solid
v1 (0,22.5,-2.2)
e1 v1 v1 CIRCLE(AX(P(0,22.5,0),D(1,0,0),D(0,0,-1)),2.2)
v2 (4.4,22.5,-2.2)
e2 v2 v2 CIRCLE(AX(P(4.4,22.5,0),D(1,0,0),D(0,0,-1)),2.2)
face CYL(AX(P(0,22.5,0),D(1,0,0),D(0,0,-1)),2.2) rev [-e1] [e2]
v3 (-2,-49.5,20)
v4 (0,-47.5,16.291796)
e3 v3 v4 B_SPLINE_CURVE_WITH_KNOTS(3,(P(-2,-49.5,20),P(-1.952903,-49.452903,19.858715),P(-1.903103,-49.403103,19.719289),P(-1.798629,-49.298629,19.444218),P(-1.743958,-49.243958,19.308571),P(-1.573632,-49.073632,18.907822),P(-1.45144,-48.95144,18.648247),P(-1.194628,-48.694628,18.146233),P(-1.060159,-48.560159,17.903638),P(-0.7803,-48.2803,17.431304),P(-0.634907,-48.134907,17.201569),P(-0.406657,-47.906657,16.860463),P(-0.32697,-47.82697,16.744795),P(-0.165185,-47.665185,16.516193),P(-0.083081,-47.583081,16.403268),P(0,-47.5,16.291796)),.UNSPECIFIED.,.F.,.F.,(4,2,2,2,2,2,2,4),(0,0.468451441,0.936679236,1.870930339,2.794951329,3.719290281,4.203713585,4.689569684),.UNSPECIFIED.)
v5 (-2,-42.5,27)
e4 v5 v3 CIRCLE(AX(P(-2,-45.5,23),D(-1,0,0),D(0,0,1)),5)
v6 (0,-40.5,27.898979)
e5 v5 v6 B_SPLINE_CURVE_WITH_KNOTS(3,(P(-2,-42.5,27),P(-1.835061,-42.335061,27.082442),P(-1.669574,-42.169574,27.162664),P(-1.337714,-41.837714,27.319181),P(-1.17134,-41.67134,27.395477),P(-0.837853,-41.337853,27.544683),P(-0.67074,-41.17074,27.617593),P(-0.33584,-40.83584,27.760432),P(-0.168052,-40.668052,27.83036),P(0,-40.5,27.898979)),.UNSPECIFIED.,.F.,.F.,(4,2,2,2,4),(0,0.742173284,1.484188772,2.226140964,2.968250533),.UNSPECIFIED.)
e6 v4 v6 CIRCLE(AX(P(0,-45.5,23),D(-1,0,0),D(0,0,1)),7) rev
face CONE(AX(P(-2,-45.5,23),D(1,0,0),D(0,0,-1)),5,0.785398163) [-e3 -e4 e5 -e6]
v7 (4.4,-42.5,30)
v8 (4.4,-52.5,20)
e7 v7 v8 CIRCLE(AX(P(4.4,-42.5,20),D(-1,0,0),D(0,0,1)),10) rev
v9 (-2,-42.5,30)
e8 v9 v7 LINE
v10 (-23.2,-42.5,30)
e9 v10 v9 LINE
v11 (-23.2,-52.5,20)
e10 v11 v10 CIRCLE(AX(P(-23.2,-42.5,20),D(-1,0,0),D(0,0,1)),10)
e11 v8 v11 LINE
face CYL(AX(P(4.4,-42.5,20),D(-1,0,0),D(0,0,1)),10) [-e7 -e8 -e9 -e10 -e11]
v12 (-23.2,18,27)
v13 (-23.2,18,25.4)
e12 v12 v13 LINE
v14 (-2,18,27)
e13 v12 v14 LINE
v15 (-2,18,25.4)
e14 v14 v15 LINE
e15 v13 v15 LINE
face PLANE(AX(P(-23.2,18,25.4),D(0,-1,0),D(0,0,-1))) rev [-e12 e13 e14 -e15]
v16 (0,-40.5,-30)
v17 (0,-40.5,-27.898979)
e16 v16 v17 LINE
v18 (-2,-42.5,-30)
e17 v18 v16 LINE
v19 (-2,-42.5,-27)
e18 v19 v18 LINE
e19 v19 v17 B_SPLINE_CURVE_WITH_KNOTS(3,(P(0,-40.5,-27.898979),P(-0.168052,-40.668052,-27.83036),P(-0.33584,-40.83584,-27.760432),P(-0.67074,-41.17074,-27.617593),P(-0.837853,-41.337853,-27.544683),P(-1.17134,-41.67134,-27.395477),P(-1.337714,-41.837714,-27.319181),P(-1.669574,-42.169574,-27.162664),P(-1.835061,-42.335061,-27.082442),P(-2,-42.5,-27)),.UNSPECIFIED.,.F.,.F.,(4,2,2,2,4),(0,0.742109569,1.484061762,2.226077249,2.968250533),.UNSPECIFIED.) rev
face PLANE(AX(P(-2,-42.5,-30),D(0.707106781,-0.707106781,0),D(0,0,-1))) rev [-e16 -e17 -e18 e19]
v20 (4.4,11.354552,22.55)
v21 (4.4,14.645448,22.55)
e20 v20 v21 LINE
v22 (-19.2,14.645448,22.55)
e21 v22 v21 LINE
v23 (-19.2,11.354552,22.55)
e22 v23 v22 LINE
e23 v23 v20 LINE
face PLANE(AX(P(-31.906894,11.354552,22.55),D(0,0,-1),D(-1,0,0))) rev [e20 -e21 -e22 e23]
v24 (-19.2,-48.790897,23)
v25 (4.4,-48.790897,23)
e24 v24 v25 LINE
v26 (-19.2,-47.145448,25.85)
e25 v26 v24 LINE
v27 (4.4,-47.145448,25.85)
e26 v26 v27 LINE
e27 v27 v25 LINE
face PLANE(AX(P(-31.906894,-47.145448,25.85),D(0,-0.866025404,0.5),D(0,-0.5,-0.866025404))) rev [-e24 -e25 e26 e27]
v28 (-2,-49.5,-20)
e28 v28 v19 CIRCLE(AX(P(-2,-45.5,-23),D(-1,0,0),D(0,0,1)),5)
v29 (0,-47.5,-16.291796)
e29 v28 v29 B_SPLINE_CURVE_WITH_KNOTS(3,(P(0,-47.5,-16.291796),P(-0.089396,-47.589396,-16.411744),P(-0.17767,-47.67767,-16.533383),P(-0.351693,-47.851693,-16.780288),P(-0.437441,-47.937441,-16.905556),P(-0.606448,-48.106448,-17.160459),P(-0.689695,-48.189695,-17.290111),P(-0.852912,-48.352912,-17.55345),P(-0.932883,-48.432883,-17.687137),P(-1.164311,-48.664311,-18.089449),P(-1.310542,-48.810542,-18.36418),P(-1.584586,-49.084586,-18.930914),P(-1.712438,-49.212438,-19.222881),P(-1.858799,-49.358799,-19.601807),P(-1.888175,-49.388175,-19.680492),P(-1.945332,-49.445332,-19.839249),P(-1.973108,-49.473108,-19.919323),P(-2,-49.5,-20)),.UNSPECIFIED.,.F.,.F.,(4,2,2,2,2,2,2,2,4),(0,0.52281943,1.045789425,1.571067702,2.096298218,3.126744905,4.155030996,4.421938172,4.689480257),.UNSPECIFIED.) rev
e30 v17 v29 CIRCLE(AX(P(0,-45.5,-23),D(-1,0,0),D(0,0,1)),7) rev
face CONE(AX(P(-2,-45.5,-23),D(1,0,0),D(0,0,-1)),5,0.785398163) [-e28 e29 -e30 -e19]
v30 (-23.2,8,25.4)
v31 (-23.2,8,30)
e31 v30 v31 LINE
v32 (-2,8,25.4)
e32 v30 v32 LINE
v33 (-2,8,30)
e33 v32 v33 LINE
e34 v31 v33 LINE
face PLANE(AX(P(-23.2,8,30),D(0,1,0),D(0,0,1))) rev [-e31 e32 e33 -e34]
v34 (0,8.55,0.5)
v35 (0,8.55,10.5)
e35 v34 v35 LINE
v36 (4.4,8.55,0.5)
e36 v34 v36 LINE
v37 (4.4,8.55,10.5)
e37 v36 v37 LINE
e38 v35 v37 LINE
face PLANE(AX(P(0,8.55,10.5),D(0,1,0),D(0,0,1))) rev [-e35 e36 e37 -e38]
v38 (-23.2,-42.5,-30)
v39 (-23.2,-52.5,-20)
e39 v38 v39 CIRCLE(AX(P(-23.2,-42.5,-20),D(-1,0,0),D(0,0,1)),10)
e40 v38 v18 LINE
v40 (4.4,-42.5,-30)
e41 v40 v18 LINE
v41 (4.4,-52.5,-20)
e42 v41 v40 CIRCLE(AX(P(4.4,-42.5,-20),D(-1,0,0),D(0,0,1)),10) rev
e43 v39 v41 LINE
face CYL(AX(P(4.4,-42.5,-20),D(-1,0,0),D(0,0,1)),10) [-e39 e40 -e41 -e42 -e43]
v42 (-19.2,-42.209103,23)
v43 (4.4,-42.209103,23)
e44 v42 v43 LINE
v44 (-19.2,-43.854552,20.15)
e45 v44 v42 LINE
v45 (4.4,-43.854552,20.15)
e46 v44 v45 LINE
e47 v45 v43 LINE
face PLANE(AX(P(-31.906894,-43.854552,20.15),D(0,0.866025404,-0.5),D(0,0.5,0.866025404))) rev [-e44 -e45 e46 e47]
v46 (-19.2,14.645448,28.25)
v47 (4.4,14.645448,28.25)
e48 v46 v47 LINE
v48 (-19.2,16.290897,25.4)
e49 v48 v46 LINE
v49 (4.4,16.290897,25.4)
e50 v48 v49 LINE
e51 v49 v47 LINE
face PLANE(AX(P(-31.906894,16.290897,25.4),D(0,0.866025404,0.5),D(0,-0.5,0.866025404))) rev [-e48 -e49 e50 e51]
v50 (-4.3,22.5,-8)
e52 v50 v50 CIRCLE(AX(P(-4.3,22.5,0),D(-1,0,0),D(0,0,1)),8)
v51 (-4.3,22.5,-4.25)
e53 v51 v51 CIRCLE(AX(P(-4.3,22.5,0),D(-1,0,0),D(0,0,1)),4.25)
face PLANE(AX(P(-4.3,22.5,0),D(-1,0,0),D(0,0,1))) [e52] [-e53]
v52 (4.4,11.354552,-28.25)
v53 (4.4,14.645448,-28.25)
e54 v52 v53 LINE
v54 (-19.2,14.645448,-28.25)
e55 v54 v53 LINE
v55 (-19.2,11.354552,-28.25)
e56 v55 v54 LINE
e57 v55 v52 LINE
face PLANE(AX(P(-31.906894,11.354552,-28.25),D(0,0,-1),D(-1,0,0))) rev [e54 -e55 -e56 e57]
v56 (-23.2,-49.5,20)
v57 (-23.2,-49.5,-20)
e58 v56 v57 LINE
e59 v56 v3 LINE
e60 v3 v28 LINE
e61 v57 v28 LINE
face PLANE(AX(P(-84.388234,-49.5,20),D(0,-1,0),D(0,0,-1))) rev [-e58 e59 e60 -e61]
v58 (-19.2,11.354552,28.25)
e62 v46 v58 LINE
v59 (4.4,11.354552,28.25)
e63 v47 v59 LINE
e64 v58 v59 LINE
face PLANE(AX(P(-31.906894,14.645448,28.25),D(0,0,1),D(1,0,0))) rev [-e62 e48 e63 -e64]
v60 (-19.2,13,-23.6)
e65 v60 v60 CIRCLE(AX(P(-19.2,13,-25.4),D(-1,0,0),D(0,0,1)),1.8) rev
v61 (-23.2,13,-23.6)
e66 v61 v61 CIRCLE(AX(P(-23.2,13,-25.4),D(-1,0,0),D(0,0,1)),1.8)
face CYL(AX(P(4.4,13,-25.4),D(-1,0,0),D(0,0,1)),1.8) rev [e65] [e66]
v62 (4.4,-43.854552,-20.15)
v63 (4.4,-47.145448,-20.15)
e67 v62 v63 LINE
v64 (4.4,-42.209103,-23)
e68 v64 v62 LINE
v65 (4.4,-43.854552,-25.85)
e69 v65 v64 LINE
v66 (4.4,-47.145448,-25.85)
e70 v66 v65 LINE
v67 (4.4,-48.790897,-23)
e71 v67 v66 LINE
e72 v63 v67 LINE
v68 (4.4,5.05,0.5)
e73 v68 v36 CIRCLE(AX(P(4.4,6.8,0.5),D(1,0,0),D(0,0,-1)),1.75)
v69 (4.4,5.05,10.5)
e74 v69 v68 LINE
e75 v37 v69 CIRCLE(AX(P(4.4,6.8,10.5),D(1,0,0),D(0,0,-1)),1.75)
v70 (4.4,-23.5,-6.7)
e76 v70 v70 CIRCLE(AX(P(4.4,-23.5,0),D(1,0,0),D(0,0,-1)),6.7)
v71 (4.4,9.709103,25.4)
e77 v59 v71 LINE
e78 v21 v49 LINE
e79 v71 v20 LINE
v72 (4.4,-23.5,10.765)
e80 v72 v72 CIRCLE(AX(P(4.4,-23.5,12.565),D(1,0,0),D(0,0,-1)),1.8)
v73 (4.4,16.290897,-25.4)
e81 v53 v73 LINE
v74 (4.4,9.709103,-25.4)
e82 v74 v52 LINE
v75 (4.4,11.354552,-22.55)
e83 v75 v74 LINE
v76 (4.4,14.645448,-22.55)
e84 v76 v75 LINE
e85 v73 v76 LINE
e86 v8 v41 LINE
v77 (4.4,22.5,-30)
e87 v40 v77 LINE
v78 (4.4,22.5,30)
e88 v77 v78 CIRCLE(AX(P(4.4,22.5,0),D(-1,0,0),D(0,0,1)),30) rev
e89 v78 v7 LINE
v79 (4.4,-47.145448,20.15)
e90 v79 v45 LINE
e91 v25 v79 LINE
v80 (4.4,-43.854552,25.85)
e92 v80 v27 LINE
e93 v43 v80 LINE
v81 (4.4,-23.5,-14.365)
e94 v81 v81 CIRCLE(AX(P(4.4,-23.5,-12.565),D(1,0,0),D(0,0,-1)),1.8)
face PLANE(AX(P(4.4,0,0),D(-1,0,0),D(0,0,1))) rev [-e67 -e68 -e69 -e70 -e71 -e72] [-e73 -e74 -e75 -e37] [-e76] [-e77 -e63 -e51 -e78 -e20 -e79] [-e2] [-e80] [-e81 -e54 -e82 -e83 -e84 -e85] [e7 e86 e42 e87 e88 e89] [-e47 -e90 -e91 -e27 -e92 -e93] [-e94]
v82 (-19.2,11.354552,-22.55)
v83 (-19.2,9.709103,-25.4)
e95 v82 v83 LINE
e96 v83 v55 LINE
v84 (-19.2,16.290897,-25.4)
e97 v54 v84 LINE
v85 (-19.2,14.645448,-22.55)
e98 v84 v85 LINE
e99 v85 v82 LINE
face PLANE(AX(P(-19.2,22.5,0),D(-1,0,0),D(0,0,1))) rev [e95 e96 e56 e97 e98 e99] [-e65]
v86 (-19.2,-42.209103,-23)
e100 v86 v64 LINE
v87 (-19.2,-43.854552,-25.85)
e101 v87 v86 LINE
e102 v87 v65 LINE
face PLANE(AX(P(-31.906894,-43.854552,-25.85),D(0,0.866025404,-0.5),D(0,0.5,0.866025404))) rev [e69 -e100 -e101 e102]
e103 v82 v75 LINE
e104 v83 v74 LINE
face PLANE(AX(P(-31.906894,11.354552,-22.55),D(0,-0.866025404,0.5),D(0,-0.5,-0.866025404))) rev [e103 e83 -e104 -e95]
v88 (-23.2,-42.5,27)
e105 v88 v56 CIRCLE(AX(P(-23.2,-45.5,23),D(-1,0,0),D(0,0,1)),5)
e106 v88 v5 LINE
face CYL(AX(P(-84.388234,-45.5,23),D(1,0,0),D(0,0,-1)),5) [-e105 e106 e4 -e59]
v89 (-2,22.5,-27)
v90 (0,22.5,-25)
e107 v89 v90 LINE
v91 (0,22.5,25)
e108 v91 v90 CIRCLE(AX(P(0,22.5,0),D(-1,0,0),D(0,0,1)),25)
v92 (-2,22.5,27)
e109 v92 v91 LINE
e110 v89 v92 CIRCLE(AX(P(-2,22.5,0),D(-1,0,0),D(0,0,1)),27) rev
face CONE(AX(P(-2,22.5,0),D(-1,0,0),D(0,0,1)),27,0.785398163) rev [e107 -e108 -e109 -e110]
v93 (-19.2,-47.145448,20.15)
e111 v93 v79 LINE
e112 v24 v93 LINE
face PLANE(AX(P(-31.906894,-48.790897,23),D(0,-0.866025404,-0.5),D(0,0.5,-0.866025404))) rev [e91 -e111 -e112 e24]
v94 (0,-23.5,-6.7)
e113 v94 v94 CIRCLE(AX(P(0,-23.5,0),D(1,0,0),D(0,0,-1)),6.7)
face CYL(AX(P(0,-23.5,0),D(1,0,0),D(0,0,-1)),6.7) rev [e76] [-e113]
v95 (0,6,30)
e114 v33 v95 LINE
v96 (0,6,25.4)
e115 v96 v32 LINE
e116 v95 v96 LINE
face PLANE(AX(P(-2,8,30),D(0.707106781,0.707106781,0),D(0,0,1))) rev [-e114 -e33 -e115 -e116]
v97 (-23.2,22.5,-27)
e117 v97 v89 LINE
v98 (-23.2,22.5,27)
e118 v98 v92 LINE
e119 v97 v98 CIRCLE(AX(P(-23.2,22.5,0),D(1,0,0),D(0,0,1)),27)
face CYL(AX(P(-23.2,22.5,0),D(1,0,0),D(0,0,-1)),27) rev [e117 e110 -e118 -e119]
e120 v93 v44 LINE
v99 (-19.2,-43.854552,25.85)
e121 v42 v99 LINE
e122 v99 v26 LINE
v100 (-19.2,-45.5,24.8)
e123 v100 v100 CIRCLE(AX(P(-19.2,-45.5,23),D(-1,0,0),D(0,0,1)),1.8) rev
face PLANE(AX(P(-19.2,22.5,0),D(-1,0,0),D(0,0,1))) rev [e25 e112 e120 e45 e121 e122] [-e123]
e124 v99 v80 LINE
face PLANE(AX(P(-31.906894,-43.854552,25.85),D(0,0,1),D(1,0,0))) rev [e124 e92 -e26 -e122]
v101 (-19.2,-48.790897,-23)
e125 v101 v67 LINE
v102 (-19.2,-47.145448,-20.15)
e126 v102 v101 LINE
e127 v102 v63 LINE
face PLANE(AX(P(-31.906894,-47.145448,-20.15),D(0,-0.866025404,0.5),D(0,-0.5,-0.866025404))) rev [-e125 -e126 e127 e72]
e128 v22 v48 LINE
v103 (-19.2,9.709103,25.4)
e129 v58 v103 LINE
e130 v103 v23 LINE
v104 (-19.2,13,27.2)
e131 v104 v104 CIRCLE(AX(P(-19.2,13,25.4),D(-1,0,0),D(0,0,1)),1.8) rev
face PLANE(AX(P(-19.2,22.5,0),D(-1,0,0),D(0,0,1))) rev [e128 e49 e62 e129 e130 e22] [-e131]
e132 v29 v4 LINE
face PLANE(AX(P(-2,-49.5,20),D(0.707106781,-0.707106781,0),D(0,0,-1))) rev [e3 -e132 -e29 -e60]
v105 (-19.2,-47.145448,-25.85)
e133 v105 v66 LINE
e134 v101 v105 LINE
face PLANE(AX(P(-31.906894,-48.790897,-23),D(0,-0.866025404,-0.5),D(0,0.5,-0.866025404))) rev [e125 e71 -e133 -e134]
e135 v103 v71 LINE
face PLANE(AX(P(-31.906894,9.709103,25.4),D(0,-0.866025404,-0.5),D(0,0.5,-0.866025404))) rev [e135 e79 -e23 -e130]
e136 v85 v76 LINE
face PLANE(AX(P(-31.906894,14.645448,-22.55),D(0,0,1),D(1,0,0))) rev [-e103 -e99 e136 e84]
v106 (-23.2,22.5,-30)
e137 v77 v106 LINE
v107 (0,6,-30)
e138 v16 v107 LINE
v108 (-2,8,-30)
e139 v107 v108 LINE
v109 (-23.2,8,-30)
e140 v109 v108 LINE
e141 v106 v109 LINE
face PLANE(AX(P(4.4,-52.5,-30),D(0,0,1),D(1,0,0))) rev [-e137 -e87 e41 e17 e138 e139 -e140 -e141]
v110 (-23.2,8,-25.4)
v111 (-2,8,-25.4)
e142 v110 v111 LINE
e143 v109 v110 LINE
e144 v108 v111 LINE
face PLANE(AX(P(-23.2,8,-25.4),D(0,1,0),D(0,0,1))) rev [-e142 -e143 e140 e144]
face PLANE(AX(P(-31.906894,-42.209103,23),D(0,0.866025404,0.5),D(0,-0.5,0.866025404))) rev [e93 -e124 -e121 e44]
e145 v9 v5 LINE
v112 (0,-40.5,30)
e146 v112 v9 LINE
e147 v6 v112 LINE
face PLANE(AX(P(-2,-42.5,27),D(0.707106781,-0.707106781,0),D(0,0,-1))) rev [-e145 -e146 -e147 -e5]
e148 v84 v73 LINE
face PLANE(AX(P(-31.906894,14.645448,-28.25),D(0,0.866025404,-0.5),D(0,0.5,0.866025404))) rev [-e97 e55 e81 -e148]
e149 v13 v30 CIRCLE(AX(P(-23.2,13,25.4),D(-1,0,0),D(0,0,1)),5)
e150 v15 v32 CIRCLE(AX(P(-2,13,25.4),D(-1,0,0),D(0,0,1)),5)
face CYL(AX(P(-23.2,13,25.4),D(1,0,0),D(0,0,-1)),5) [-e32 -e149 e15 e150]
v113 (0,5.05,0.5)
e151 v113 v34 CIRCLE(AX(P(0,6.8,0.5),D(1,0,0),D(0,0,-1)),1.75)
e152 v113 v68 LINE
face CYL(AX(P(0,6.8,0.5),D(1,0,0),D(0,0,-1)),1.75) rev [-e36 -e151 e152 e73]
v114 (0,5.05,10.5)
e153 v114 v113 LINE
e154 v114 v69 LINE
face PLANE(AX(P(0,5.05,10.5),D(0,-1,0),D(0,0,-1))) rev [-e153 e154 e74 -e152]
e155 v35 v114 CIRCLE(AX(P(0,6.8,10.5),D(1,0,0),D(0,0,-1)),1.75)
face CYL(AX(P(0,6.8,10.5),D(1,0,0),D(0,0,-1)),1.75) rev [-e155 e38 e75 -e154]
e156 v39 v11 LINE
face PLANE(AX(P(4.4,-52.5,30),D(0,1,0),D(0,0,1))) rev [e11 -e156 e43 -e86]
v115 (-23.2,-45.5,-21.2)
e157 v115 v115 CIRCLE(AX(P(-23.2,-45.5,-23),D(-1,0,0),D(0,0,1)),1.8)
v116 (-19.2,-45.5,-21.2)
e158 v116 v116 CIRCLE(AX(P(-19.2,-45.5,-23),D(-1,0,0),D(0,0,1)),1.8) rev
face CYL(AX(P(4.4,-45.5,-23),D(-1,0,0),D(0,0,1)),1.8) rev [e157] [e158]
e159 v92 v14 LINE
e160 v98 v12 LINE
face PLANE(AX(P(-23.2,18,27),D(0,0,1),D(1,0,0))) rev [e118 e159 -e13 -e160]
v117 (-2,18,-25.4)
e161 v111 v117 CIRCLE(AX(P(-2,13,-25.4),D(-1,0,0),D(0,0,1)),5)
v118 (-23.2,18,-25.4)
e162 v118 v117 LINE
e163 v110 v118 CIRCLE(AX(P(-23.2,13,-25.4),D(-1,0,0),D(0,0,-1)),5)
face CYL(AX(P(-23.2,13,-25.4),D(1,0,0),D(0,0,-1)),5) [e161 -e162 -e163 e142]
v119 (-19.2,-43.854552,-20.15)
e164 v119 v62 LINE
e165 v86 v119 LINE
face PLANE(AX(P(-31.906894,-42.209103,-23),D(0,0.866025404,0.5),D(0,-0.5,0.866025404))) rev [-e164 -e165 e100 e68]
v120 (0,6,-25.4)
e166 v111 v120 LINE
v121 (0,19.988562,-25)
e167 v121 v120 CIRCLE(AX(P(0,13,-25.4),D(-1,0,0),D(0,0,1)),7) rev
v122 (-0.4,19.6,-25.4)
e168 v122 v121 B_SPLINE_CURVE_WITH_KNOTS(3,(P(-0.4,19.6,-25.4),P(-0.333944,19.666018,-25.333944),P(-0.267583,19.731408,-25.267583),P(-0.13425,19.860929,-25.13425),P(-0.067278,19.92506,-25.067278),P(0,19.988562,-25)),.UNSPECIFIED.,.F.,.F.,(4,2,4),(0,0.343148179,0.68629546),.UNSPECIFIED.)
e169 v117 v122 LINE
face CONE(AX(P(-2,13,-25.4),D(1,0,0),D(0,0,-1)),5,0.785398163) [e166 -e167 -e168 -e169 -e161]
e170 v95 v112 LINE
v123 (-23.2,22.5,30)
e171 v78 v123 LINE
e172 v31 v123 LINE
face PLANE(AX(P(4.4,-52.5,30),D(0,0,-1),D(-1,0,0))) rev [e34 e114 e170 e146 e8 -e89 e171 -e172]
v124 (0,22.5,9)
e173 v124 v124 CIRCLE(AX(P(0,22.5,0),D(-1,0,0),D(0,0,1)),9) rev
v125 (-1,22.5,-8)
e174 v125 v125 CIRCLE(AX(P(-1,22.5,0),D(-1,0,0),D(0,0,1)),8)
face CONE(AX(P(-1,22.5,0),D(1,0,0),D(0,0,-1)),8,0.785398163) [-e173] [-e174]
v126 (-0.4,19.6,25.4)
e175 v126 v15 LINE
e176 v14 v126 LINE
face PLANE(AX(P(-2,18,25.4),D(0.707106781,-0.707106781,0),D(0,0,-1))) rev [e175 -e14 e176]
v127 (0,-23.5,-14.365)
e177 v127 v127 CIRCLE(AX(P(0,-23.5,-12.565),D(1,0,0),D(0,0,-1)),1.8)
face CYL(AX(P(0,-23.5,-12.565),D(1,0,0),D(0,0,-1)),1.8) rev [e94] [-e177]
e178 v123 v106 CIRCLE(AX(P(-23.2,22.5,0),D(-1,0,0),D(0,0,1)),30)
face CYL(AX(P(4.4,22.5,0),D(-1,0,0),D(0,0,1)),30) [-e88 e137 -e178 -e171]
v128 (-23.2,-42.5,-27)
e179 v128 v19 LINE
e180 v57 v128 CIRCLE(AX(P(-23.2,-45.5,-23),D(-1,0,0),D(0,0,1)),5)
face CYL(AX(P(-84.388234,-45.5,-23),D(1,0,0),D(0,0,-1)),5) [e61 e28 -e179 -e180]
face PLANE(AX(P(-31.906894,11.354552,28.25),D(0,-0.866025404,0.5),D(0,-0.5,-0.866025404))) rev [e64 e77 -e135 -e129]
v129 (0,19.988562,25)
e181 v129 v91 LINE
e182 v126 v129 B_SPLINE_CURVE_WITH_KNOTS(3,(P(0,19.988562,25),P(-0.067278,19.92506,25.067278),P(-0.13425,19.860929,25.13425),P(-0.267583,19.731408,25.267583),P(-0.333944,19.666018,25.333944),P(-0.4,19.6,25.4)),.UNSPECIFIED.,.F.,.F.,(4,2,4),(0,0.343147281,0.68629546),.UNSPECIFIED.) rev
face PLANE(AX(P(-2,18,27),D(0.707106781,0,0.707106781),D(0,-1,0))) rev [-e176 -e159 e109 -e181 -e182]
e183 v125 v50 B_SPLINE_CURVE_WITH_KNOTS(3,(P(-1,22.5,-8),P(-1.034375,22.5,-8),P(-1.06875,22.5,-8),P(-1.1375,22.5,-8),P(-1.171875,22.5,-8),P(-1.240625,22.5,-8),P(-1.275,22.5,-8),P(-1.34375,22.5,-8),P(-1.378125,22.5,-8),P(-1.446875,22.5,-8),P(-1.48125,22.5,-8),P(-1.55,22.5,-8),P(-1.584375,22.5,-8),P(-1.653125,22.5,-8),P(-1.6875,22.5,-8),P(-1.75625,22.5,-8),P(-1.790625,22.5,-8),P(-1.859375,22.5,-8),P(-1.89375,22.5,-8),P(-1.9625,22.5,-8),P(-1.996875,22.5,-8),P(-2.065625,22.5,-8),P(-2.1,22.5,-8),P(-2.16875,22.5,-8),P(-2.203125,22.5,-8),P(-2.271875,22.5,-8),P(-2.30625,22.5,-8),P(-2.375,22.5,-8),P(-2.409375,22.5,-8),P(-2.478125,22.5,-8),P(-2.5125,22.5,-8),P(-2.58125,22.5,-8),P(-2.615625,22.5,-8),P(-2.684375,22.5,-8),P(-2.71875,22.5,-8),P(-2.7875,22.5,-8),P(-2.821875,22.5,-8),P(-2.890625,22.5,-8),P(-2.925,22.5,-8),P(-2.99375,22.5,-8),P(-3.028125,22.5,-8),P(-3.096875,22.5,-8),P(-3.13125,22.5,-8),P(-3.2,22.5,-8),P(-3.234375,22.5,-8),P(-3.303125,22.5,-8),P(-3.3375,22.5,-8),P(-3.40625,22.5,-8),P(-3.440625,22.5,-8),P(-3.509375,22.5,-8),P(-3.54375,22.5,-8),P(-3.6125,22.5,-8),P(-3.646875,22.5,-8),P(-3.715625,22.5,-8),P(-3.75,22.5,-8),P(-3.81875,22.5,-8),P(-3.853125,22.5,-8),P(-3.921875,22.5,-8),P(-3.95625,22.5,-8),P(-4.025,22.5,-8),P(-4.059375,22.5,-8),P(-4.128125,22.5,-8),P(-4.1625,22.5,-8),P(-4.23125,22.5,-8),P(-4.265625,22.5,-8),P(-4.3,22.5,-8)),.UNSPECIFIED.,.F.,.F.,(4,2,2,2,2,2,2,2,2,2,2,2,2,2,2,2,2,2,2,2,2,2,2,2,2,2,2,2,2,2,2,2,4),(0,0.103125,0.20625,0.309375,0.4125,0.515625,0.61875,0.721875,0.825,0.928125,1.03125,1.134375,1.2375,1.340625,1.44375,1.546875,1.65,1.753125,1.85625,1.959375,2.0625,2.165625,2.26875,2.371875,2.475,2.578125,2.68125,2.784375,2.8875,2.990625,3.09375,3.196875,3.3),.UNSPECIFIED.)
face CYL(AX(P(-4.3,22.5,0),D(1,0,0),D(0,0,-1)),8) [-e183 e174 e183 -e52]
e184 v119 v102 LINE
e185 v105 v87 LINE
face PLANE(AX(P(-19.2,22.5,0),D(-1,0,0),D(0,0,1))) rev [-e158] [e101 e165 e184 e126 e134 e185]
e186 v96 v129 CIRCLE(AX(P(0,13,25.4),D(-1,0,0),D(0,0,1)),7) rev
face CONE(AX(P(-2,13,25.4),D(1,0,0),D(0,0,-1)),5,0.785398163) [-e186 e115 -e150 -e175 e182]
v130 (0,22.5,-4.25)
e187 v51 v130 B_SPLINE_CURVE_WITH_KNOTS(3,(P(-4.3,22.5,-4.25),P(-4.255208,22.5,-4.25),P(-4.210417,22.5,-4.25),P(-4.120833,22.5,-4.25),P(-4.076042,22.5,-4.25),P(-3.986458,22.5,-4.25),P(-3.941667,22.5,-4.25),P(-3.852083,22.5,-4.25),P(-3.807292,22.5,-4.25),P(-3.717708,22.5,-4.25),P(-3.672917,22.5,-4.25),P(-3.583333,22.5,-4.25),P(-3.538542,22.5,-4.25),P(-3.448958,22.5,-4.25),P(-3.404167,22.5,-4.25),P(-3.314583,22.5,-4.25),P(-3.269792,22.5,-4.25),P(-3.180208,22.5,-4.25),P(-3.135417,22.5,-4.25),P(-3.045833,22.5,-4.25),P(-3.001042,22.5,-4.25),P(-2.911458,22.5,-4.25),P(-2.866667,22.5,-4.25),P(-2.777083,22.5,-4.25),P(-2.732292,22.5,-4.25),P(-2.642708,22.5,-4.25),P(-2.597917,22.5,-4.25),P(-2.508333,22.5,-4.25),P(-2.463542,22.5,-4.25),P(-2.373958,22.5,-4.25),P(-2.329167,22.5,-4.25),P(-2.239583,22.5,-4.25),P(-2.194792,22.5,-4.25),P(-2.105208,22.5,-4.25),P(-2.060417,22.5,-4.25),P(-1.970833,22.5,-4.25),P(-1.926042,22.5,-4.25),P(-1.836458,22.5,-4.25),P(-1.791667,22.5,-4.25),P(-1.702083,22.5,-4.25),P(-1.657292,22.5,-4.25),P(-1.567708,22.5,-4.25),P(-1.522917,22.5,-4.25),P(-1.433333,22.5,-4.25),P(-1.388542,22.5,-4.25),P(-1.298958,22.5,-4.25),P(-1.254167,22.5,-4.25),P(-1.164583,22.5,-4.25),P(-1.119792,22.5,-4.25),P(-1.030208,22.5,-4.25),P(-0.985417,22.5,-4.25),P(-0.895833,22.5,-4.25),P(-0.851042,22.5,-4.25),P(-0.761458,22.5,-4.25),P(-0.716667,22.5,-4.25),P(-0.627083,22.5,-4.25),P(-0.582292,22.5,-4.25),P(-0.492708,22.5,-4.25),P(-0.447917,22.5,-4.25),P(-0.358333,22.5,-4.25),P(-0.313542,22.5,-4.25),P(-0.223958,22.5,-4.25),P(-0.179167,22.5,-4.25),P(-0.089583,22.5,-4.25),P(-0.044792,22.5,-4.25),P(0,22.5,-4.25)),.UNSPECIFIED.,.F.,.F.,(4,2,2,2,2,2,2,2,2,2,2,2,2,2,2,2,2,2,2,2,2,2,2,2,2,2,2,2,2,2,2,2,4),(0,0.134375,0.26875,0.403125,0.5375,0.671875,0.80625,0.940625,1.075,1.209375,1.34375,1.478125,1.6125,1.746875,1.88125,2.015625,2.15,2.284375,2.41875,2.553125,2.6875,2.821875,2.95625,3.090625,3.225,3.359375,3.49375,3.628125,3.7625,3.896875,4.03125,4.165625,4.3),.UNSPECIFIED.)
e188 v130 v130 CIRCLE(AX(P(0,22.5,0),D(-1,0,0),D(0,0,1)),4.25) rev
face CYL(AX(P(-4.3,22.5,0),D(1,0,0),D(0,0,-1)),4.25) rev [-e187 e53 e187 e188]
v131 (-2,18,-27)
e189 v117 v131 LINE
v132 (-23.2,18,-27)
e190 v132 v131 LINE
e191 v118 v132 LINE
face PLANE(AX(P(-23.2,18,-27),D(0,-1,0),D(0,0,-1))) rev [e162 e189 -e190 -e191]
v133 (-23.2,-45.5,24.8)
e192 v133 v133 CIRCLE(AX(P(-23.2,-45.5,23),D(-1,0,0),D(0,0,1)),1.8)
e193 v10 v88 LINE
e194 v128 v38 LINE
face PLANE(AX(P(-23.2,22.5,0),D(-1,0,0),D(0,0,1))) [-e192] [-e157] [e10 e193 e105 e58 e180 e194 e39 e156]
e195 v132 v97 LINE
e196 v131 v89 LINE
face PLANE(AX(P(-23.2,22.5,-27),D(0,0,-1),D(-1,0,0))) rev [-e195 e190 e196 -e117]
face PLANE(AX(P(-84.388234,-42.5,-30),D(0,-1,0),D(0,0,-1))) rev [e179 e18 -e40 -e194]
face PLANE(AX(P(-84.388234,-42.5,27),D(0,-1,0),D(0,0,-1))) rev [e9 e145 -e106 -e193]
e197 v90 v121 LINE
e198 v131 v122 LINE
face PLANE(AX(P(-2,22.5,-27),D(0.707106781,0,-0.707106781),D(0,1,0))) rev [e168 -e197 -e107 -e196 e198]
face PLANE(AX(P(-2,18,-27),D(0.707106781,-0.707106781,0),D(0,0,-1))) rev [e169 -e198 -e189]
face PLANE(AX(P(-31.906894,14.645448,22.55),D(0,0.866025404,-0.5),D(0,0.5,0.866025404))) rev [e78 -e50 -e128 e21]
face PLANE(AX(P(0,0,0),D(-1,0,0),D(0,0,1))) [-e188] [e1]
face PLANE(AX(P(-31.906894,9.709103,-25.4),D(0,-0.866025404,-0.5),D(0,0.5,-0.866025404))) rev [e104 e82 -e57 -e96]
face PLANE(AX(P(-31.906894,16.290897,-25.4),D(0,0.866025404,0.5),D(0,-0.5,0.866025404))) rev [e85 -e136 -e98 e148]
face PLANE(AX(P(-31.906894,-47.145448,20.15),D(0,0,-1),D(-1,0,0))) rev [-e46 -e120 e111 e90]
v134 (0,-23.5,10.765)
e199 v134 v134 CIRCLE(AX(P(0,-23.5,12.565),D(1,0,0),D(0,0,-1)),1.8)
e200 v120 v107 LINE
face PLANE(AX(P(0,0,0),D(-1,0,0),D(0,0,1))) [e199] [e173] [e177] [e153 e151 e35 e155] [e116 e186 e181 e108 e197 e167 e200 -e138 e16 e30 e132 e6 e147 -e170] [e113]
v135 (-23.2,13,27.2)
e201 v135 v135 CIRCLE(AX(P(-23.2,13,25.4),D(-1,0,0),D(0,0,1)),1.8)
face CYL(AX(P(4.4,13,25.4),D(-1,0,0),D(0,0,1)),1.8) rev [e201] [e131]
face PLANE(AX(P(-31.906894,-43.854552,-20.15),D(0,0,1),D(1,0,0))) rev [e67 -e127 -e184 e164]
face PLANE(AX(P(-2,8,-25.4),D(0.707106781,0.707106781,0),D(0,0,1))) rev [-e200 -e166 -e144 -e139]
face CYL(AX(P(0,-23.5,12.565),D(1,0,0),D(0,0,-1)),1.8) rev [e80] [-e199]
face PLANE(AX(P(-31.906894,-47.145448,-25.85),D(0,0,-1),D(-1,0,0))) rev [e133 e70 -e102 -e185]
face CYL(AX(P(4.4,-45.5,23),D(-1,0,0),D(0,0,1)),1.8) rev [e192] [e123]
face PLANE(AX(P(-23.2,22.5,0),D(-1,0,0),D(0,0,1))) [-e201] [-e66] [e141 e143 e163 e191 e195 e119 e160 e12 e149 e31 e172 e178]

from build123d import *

# Parameters (mm, degrees)
SKETCH1_W           = 60
SKETCH1_H           = 105
BOSS_EXTRUDE1_DEPTH = 4.4
SKETCH2_R           = 2.2
SKETCH2_R_2         = 6.7
SKETCH2_R_3         = 1.8
CUT_EXTRUDE1_DEPTH  = 61.626809251
CUT_EXTRUDE2_DEPTH  = 61.626809251
SKETCH5_R           = 8
SKETCH5_R_2         = 4.25
BOSS_EXTRUDE2_DEPTH = 4.3
CHAMFER1_SIZE       = 1
CUT_EXTRUDE3_DEPTH  = 61.626809251
BOSS_EXTRUDE3_START = 23.2
BOSS_EXTRUDE3_DEPTH = 23.2
SKETCH8_R           = 1.8
CUT_EXTRUDE4_DEPTH  = 67.468112656
FILLET1_R           = 10
BOSS_EXTRUDE4_DEPTH = 23.2
SKETCH11_R          = 1.8
CUT_EXTRUDE6_DEPTH  = 67.468112656
CUT_EXTRUDE5_DEPTH  = 23.6
CHAMFER2_SIZE       = 2


with BuildPart() as part:
    # Sketch1 → Boss-Extrude1 (new body)
    with BuildSketch(Plane(origin=(0, 0, 0), x_dir=(0, 0, -1), z_dir=(1, 0, 0))):
        Rectangle(SKETCH1_W, SKETCH1_H)
    extrude(amount=BOSS_EXTRUDE1_DEPTH)

    # Sketch2 → Cut-Extrude1 (cut, through all)
    with BuildSketch(Plane(origin=(4.4, 0, 0), x_dir=(0, 0, -1), z_dir=(1, 0, 0))):
        with Locations((0, 22.5)):
            Circle(SKETCH2_R)
        with Locations((0, -23.5)):
            Circle(SKETCH2_R_2)
        with Locations((-12.565, -23.5)):
            Circle(SKETCH2_R_3)
        with Locations((12.565, -23.5)):
            Circle(SKETCH2_R_3)
    extrude(amount=-CUT_EXTRUDE1_DEPTH, mode=Mode.SUBTRACT)

    # Sketch4 → Cut-Extrude2 (cut, through all)
    with BuildSketch(Plane(origin=(4.4, 0, 0), x_dir=(0, 0, -1), z_dir=(1, 0, 0))):
        with BuildLine():
            Line((-10.5, 8.55), (-0.5, 8.55))
            ThreePointArc((-0.5, 8.55), (1.25, 6.8), (-0.5, 5.05))
            Line((-0.5, 5.05), (-10.5, 5.05))
            ThreePointArc((-10.5, 5.05), (-12.25, 6.8), (-10.5, 8.55))
        make_face()
    extrude(amount=-CUT_EXTRUDE2_DEPTH, mode=Mode.SUBTRACT)

    # Sketch5 → Boss-Extrude2 (add)
    with BuildSketch(Plane.ZY):
        with Locations(Location((0, 22.5, 0), (0, 0, 180))):
            Circle(SKETCH5_R)
        with Locations(Location((0, 22.5, 0), (0, 0, 180))):
            Circle(SKETCH5_R_2, mode=Mode.SUBTRACT)
    extrude(amount=BOSS_EXTRUDE2_DEPTH)

    # Chamfer1
    chamfer1_edges = [part.edges().sort_by_distance(p)[0] for p in [
        (0, 22.5, 8),
    ]]
    chamfer(chamfer1_edges, length=CHAMFER1_SIZE)

    # Sketch6 → Cut-Extrude3 (cut, through all)
    with BuildSketch(Plane.ZY):
        with BuildLine():
            Line((-30, 52.5), (-30, 22.5))
            ThreePointArc((-30, 22.5), (-21.213203436, 43.713203436), (0, 52.5))
            Line((0, 52.5), (-30, 52.5))
        make_face()
        with BuildLine():
            Line((30, 52.5), (0, 52.5))
            ThreePointArc((0, 52.5), (21.213203436, 43.713203436), (30, 22.5))
            Line((30, 22.5), (30, 52.5))
        make_face()
    extrude(amount=-CUT_EXTRUDE3_DEPTH, mode=Mode.SUBTRACT)

    # Sketch7 → Boss-Extrude3 (add)
    with BuildSketch(Plane.ZY.offset(BOSS_EXTRUDE3_START)):
        with BuildLine():
            Line((-30, 22.5), (-30, 8))
            Line((-30, 8), (-27, 8))
            Line((-27, 8), (-25.4, 8))
            ThreePointArc((-25.4, 8), (-20.4, 13), (-25.4, 18))
            Line((-25.4, 18), (-27, 18))
            Line((-27, 18), (-27, 22.5))
            ThreePointArc((-27, 22.5), (0, 49.5), (27, 22.5))
            Line((27, 22.5), (27, 18))
            Line((27, 18), (25.4, 18))
            ThreePointArc((25.4, 18), (20.4, 13), (25.4, 8))
            Line((25.4, 8), (27, 8))
            Line((27, 8), (30, 8))
            Line((30, 8), (30, 22.5))
            ThreePointArc((30, 22.5), (0, 52.5), (-30, 22.5))
        make_face()
    extrude(amount=-BOSS_EXTRUDE3_DEPTH)

    # Sketch8 → Cut-Extrude4 (cut, through all)
    with BuildSketch(Plane.ZY.offset(23.2)):
        with Locations((-25.4, 13)):
            Circle(SKETCH8_R)
        with Locations((25.4, 13)):
            Circle(SKETCH8_R)
    extrude(amount=-CUT_EXTRUDE4_DEPTH, mode=Mode.SUBTRACT)

    # Fillet1
    fillet1_edges = [part.edges().sort_by_distance(p)[0] for p in [
        (2.2, -52.5, -30),
        (2.2, -52.5, 30),
    ]]
    fillet(fillet1_edges, radius=FILLET1_R)

    # Sketch10 → Boss-Extrude4 (add)
    with BuildSketch(Plane.ZY):
        with BuildLine():
            Line((20, -52.5), (-20, -52.5))
            ThreePointArc((-20, -52.5), (-27.071067812, -49.571067812), (-30, -42.5))
            Line((-30, -42.5), (-27, -42.5))
            ThreePointArc((-27, -42.5), (-19.464466094, -41.964466094), (-20, -49.5))
            Line((-20, -49.5), (20, -49.5))
            ThreePointArc((20, -49.5), (19.464466094, -41.964466094), (27, -42.5))
            Line((27, -42.5), (30, -42.5))
            ThreePointArc((30, -42.5), (27.071067812, -49.571067812), (20, -52.5))
        make_face()
    extrude(amount=BOSS_EXTRUDE4_DEPTH)

    # Sketch11 → Cut-Extrude6 (cut, through all)
    with BuildSketch(Plane.ZY.offset(23.2)):
        with Locations((-23, -45.5)):
            Circle(SKETCH11_R)
        with Locations((23, -45.5)):
            Circle(SKETCH11_R)
    extrude(amount=-CUT_EXTRUDE6_DEPTH, mode=Mode.SUBTRACT)

    # Sketch9 → Cut-Extrude5 (cut)
    with BuildSketch(Plane(origin=(4.4, 0, 0), x_dir=(0, 0, -1), z_dir=(1, 0, 0))):
        Polygon((-25.4, 9.709103466), (-22.55, 11.354551733), (-22.55, 14.645448267), (-25.4, 16.290896534), (-28.25, 14.645448267), (-28.25, 11.354551733), align=None)
        Polygon((25.4, 9.709103466), (28.25, 11.354551733), (28.25, 14.645448267), (25.4, 16.290896534), (22.55, 14.645448267), (22.55, 11.354551733), align=None)
        Polygon((-23, -42.209103466), (-25.85, -43.854551733), (-25.85, -47.145448267), (-23, -48.790896534), (-20.15, -47.145448267), (-20.15, -43.854551733), align=None)
        Polygon((23, -48.790896534), (25.85, -47.145448267), (25.85, -43.854551733), (23, -42.209103466), (20.15, -43.854551733), (20.15, -47.145448267), align=None)
    extrude(amount=-CUT_EXTRUDE5_DEPTH, mode=Mode.SUBTRACT)

    # Chamfer2
    # the kernel refuses this chamfer: 2 mm, written as the material it adds along each edge
    with BuildSketch(Plane(origin=(0, 12.856634024, -27), x_dir=(0.02749587661058639, 0, 0.9996219169112968), z_dir=(0, 1, 0))) as chamfer2_piece_1_section:
        Polygon((CHAMFER2_SIZE * 0.999621916911, -CHAMFER2_SIZE * 0.0274958766106), (-CHAMFER2_SIZE * 0.0274958766106, -CHAMFER2_SIZE * 0.999621916911), (0, 0), align=None)
    chamfer2_piece_1 = extrude(amount=9.643365976, mode=Mode.PRIVATE)
    chamfer2_piece_1 = split(chamfer2_piece_1, bisect_by=Plane(origin=(-0.079985343, 16.613435796, -25.958654389), z_dir=(0, 0.866025403784439, 0.4999999999999995)), keep=Keep.TOP, mode=Mode.PRIVATE)
    add(chamfer2_piece_1)
    with BuildSketch(Plane(origin=(0, 22.5, 27), x_dir=(0.02749587661058639, 0, -0.9996219169112968), z_dir=(0, -1, 0))) as chamfer2_piece_2_section:
        Polygon((CHAMFER2_SIZE * 0.999621916911, -CHAMFER2_SIZE * 0.0274958766106), (-CHAMFER2_SIZE * 0.0274958766106, -CHAMFER2_SIZE * 0.999621916911), (0, 0), align=None)
    chamfer2_piece_2 = extrude(amount=9.643365976, mode=Mode.PRIVATE)
    chamfer2_piece_2 = split(chamfer2_piece_2, bisect_by=Plane(origin=(-0.629221359, 16.946033943, 24.265268722), z_dir=(0, 0.8660254037844389, 0.4999999999999995)), keep=Keep.TOP, mode=Mode.PRIVATE)
    add(chamfer2_piece_2)
    with BuildSketch(Plane(origin=(0, 22.5, 0), x_dir=(0, 0, -1), z_dir=(0, -1, 0))) as chamfer2_piece_3:
        Polygon((27 - CHAMFER2_SIZE, 0), (27, -CHAMFER2_SIZE), (27, 0), align=None)
    revolve(axis=Axis((0, 22.5, 0), (1, 0, 0)), revolution_arc=180)
    with BuildSketch(Plane(origin=(0, 13, 25.4), x_dir=(0, 1, 0), z_dir=(0, 0, 1))) as chamfer2_piece_4:
        Polygon((5 + CHAMFER2_SIZE, 0), (5, CHAMFER2_SIZE), (5, 0), align=None)
    revolve(axis=Axis((0, 13, 25.4), (-1, 0, 0)), revolution_arc=180)
    with BuildSketch(Plane(origin=(0, 8, 25.4), x_dir=(0.027495876610586365, -0.9996219169112968, 0), z_dir=(0, 0, 1)), Plane(origin=(0, 8, -30), x_dir=(0.027495876610586365, -0.9996219169112968, 0), z_dir=(0, 0, 1))) as chamfer2_piece_5:
        Polygon((CHAMFER2_SIZE * 0.999621916911, -CHAMFER2_SIZE * 0.0274958766106), (-CHAMFER2_SIZE * 0.0274958766106, -CHAMFER2_SIZE * 0.999621916911), (0, 0), align=None)
    extrude(amount=4.6)
    with BuildSketch(Plane(origin=(0, 13, -25.4), x_dir=(0, -1, 0), z_dir=(0, 0, -1))) as chamfer2_piece_6:
        Polygon((5 + CHAMFER2_SIZE, 0), (5, CHAMFER2_SIZE), (5, 0), align=None)
    revolve(axis=Axis((0, 13, -25.4), (-1, 0, 0)), revolution_arc=180)
    with BuildSketch(Plane(origin=(0, -42.5, -30), x_dir=(0.02749587661058639, 0.9996219169112968, 0), z_dir=(0, 0, 1))) as chamfer2_piece_7_section:
        Polygon((CHAMFER2_SIZE * 0.999621916911, CHAMFER2_SIZE * 0.0274958766106), (-CHAMFER2_SIZE * 0.0274958766106, CHAMFER2_SIZE * 0.999621916911), (0, 0), align=None)
    chamfer2_piece_7 = extrude(amount=8.143365976, mode=Mode.PRIVATE)
    chamfer2_piece_7 = split(chamfer2_piece_7, bisect_by=Plane(origin=(-0.399536962, -44.995246479, -27.825741256), z_dir=(0, 0.8660254037844387, -0.4999999999999999)), keep=Keep.TOP, mode=Mode.PRIVATE)
    add(chamfer2_piece_7)
    with BuildSketch(Plane(origin=(0, -42.5, 21.856634024), x_dir=(0.02749587661058639, 0.9996219169112968, 0), z_dir=(0, 0, 1))) as chamfer2_piece_8_section:
        Polygon((CHAMFER2_SIZE * 0.999621916911, CHAMFER2_SIZE * 0.0274958766106), (-CHAMFER2_SIZE * 0.0274958766106, CHAMFER2_SIZE * 0.999621916911), (0, 0), align=None)
    chamfer2_piece_8 = extrude(amount=8.143365976, mode=Mode.PRIVATE)
    chamfer2_piece_8 = split(chamfer2_piece_8, bisect_by=Plane(origin=(-0.031503092, -41.384608505, 21.571932838), z_dir=(0, 0.8660254037844383, 0.5000000000000008)), keep=Keep.TOP, mode=Mode.PRIVATE)
    add(chamfer2_piece_8)
    with BuildSketch(Plane(origin=(0, -45.5, 23), x_dir=(0, -0.9259929219168064, 0.37754087005246884), z_dir=(0, 0.37754087005246884, 0.9259929219168064))) as chamfer2_piece_9_section:
        Polygon((5 + CHAMFER2_SIZE, 0), (5, -CHAMFER2_SIZE), (5, 0), align=None)
    chamfer2_piece_9 = revolve(axis=Axis((0, -45.5, 23), (1, 0, 0)), revolution_arc=314.36288287, mode=Mode.PRIVATE)
    chamfer2_piece_9 = chamfer2_piece_9 & Plane(origin=(-0.670588615, -42.5, 20), x_dir=(0, 0, 1), z_dir=(1, 0, 0)) * Cylinder(10, 28, mode=Mode.PRIVATE)
    add(chamfer2_piece_9)
    with BuildSketch(Plane(origin=(0, -45.5, -23), x_dir=(0, -0.3775408700524707, -0.9259929219168057), z_dir=(0, -0.9259929219168057, 0.3775408700524707))) as chamfer2_piece_10_section:
        Polygon((5 + CHAMFER2_SIZE, 0), (5, -CHAMFER2_SIZE), (5, 0), align=None)
    chamfer2_piece_10 = revolve(axis=Axis((0, -45.5, -23), (1, 0, 0)), revolution_arc=314.36288287, mode=Mode.PRIVATE)
    chamfer2_piece_10 = chamfer2_piece_10 & Plane(origin=(-0.979908178, -42.5, -20), x_dir=(0, -1, 0), z_dir=(1, 0, 0)) * Cylinder(10, 28, mode=Mode.PRIVATE)
    add(chamfer2_piece_10)
    with BuildSketch(Plane(origin=(0, -49.5, -25.143365976), x_dir=(0.02749587661058639, 0.9996219169112968, 0), z_dir=(0, 0, 1))) as chamfer2_piece_11_section:
        Polygon((CHAMFER2_SIZE * 0.999621916911, CHAMFER2_SIZE * 0.0274958766106), (-CHAMFER2_SIZE * 0.0274958766106, CHAMFER2_SIZE * 0.999621916911), (0, 0), align=None)
    chamfer2_piece_11 = extrude(amount=50.286731952, mode=Mode.PRIVATE)
    chamfer2_piece_11 = split(chamfer2_piece_11, bisect_by=Plane(origin=(-0.67159105, -38.844675798, 5.772640341), z_dir=(0, -0.8660254037844397, -0.4999999999999982)), keep=Keep.TOP, mode=Mode.PRIVATE)
    chamfer2_piece_11 = split(chamfer2_piece_11, bisect_by=Plane(origin=(-0.67159105, -38.844675769, -5.77264029), z_dir=(0, -0.8660254037844408, 0.4999999999999964)), keep=Keep.TOP, mode=Mode.PRIVATE)
    add(chamfer2_piece_11)
    with BuildSketch(Plane(origin=(0, 18, -25.4), x_dir=(0.02749587661058639, 0.9996219169112968, 0), z_dir=(0, 0, -1))) as chamfer2_piece_12_section:
        Polygon((CHAMFER2_SIZE * 0.999621916911, -CHAMFER2_SIZE * 0.0274958766106), (-CHAMFER2_SIZE * 0.0274958766106, -CHAMFER2_SIZE * 0.999621916911), (0, 0), align=None)
    chamfer2_piece_12 = extrude(amount=6.743365976, mode=Mode.PRIVATE)
    chamfer2_piece_12 = split(chamfer2_piece_12, bisect_by=Plane(origin=(-0.666666667, 18.666666667, -30), z_dir=(0, 0, 1)), keep=Keep.TOP, mode=Mode.PRIVATE)
    add(chamfer2_piece_12)
    with BuildSketch(Plane(origin=(0, 18, 27), x_dir=(0.02749587661058639, 0.9996219169112968, 0), z_dir=(0, 0, -1))) as chamfer2_piece_13:
        Polygon((CHAMFER2_SIZE * 0.999621916911, -CHAMFER2_SIZE * 0.0274958766106), (-CHAMFER2_SIZE * 0.0274958766106, -CHAMFER2_SIZE * 0.999621916911), (0, 0), align=None)
    extrude(amount=1.6)


solid = part.part
